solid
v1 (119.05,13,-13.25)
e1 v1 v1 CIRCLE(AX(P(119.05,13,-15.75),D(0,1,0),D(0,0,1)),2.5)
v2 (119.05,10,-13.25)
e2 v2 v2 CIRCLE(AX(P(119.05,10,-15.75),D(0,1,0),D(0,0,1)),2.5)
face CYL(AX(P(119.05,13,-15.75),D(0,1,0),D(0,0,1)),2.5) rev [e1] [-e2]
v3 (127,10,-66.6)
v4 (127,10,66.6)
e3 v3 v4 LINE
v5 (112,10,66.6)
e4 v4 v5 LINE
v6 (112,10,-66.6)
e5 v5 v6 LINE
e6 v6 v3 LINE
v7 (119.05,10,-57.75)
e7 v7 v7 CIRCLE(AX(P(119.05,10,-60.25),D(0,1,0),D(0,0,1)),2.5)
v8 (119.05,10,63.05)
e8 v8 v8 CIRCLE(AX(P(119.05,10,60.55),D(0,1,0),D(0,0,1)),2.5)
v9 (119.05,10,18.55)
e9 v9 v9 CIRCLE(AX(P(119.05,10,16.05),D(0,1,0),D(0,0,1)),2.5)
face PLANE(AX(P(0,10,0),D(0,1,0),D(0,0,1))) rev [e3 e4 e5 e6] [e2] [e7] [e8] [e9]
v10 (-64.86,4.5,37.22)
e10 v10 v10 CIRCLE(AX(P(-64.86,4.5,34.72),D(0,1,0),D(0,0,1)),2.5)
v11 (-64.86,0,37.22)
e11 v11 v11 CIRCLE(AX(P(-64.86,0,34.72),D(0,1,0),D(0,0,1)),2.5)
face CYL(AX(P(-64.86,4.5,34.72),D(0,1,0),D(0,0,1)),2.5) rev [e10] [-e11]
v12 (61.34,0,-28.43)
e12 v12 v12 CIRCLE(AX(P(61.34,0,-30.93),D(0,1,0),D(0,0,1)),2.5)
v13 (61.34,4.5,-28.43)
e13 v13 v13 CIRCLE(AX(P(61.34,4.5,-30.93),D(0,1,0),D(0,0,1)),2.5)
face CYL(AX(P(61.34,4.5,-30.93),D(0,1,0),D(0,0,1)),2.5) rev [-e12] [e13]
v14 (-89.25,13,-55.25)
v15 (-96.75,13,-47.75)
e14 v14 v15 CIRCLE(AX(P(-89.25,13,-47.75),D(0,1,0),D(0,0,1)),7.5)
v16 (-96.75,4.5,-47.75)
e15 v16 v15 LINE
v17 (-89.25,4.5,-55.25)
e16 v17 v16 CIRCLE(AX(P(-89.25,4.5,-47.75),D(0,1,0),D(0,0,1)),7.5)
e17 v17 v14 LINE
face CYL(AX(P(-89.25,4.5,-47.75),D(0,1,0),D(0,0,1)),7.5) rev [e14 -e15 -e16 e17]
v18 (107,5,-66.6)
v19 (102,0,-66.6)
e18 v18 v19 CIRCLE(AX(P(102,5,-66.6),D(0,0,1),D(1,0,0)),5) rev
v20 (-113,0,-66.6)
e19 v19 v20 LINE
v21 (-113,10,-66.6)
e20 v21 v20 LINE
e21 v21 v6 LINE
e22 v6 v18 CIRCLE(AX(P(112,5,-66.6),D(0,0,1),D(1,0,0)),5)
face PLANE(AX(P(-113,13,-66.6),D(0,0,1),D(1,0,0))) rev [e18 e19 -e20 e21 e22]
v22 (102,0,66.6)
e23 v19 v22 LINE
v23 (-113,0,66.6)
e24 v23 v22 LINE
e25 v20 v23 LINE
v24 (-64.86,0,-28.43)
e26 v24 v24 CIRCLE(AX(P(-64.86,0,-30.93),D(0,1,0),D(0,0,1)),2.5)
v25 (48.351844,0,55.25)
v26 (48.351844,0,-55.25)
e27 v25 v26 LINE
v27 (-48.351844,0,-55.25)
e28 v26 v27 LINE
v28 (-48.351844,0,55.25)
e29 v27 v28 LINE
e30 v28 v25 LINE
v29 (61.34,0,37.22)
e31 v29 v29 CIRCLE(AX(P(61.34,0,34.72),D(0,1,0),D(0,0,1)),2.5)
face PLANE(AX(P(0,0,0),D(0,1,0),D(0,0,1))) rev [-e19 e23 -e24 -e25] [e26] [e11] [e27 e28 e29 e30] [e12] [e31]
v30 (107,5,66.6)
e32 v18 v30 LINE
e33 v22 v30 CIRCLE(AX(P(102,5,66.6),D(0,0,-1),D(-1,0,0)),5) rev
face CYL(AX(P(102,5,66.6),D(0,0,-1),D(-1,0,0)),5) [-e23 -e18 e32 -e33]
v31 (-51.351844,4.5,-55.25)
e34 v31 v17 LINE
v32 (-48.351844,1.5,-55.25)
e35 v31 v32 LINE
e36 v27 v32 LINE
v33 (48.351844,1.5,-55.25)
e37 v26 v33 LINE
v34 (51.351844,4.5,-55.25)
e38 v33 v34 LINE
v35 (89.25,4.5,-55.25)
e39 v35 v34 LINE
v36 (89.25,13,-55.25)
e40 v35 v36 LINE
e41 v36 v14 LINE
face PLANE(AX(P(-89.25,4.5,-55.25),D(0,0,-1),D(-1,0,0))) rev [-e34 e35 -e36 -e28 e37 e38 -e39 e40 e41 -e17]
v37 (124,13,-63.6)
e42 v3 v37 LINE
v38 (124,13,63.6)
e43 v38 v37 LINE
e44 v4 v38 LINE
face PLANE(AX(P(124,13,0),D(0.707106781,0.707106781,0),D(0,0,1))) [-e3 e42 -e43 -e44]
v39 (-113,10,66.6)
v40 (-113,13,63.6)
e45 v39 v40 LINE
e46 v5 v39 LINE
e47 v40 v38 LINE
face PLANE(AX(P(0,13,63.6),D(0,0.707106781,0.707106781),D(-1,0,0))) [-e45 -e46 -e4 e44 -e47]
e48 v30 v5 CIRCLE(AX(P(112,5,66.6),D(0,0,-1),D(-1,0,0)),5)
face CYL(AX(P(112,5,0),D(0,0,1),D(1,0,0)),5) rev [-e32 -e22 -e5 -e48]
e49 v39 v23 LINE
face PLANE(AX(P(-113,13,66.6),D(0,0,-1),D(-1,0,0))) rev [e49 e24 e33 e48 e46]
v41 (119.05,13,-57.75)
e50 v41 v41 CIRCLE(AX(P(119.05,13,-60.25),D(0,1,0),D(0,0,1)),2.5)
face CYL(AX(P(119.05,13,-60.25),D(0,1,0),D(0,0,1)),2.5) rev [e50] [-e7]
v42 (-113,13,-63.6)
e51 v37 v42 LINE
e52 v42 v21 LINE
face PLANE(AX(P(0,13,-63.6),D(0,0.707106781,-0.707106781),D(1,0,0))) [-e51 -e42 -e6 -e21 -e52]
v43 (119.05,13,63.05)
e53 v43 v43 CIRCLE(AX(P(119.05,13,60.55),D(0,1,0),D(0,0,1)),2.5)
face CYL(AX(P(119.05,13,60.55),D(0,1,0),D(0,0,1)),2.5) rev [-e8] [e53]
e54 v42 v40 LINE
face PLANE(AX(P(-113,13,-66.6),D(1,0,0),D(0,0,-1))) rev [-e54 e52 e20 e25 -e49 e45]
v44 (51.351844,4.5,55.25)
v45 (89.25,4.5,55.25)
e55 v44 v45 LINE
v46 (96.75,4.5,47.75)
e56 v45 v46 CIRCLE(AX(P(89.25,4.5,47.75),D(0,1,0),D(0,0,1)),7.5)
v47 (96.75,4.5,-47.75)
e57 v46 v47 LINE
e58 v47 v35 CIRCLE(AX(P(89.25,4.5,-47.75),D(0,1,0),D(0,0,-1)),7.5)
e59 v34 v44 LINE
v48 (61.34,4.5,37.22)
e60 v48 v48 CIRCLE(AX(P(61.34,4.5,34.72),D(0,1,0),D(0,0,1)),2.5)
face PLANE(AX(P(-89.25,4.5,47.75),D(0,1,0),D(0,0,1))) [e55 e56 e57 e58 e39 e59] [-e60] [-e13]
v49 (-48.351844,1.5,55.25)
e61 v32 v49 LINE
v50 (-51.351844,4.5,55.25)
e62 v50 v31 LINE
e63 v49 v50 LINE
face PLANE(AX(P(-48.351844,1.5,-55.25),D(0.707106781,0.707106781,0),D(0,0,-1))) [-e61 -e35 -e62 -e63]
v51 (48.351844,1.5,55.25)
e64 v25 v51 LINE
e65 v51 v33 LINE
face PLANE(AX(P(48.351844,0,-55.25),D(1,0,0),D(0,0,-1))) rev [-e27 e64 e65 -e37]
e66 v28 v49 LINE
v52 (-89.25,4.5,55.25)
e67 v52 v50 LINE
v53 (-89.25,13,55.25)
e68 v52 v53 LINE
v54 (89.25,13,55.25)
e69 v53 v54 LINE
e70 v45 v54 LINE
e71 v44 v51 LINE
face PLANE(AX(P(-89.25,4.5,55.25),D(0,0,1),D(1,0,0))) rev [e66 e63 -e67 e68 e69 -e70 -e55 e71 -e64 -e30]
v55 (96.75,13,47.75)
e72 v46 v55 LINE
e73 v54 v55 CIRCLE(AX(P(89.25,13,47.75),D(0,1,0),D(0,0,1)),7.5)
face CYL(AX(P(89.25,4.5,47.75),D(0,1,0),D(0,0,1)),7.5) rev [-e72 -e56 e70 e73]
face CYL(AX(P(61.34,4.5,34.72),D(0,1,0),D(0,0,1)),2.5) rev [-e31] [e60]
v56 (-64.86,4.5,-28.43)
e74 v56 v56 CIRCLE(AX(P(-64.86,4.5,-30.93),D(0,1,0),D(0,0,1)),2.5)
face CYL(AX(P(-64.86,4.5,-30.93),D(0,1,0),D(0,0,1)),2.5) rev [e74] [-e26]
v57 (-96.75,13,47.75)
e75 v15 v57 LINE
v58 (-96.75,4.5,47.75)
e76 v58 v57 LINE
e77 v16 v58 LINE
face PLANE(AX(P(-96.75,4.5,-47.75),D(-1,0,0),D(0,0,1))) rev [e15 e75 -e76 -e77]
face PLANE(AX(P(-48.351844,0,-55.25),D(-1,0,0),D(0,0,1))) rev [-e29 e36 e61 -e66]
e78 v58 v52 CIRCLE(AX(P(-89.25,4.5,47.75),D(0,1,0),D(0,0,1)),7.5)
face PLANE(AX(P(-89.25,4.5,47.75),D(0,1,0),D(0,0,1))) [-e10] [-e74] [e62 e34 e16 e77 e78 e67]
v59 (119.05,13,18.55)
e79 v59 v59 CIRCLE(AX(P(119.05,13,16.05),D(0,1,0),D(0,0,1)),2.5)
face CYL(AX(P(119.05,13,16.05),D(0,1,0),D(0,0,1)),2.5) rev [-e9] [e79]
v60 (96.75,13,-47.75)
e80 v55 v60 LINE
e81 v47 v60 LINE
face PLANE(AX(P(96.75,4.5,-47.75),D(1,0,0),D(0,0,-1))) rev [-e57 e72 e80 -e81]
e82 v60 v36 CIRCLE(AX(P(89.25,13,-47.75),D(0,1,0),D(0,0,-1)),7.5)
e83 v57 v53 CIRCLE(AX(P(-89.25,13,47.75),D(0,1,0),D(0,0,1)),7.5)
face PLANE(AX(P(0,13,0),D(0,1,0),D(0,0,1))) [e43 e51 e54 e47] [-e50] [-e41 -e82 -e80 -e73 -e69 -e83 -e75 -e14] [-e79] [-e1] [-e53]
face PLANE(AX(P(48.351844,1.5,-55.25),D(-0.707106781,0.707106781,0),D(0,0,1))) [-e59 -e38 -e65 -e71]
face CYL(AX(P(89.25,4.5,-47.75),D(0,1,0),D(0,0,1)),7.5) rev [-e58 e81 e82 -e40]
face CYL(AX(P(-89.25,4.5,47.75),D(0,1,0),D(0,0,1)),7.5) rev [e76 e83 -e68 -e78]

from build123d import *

# Parameters (mm, degrees)
SKETCH1_W                        = 240
SKETCH1_H                        = 133.2
BOSS_EXTRUDE1_DEPTH              = 13
CUT_EXTRUDE1_DEPTH               = 8.5
F_1_8_27_NPSM_TAPPED_HOLE1_D     = 5
F_1_8_27_NPSM_TAPPED_HOLE1_DEPTH = 22.99
F_1_8_27_NPSM_TAPPED_HOLE1_TIP   = 1.502151548
SKETCH6_W                        = 96.703687768
SKETCH6_H                        = 110.5
CUT_EXTRUDE2_DEPTH               = 144.655177421
SKETCH32_W                       = 20
SKETCH32_H                       = 133.2
CUT_EXTRUDE10_DEPTH              = 10
FILLET1_START                    = -68
FILLET1_DEPTH                    = 136
FILLET1_START_2                  = -66.6
FILLET1_2_DEPTH                  = 133.2
M6X1_0_TAPPED_HOLE1_D            = 5
M6X1_0_TAPPED_HOLE1_DEPTH        = 15
M6X1_0_TAPPED_HOLE1_TIP          = 1.502151548
CHAMFER1_SIZE                    = 3


with BuildPart() as part:
    # Sketch1 → Boss-Extrude1 (new body)
    with BuildSketch(Plane(origin=(0, 0, 0), x_dir=(1, 0, 0), z_dir=(0, 1, 0))):
        with Locations((7, 0)):
            Rectangle(SKETCH1_W, SKETCH1_H)
    extrude(amount=BOSS_EXTRUDE1_DEPTH)

    # Sketch2 → Cut-Extrude1 (cut)
    with BuildSketch(Plane(origin=(0, 13, 0), x_dir=(1, 0, 0), z_dir=(0, 1, 0))):
        with BuildLine():
            Line((-89.25, 55.25), (89.25, 55.25))
            ThreePointArc((89.25, 55.25), (94.553300859, 53.053300859), (96.75, 47.75))
            Line((96.75, 47.75), (96.75, -47.75))
            ThreePointArc((96.75, -47.75), (94.553300859, -53.053300859), (89.25, -55.25))
            Line((89.25, -55.25), (-89.25, -55.25))
            ThreePointArc((-89.25, -55.25), (-94.553300859, -53.053300859), (-96.75, -47.75))
            Line((-96.75, -47.75), (-96.75, 47.75))
            ThreePointArc((-96.75, 47.75), (-94.553300859, 53.053300859), (-89.25, 55.25))
        make_face()
    extrude(amount=-CUT_EXTRUDE1_DEPTH, mode=Mode.SUBTRACT)

    # 1/8-27 NPSM Tapped Hole1
    with Locations(Plane(origin=(0, 4.5, 0), x_dir=(1, 0, 0), z_dir=(0, 1, 0))):
        with Locations((-64.86, 30.93), (61.34, 30.93), (61.34, -34.72), (-64.86, -34.72)):
            Hole(F_1_8_27_NPSM_TAPPED_HOLE1_D / 2, depth=F_1_8_27_NPSM_TAPPED_HOLE1_DEPTH)
            with Locations((0, 0, -(F_1_8_27_NPSM_TAPPED_HOLE1_DEPTH + F_1_8_27_NPSM_TAPPED_HOLE1_TIP / 2))):  # 118° drill point
                Cone(0, F_1_8_27_NPSM_TAPPED_HOLE1_D / 2, F_1_8_27_NPSM_TAPPED_HOLE1_TIP, mode=Mode.SUBTRACT)

    # Sketch6 → Cut-Extrude2 (cut, through all)
    with BuildSketch(Plane(origin=(0, 4.5, 0), x_dir=(1, 0, 0), z_dir=(0, 1, 0))):
        Rectangle(SKETCH6_W, SKETCH6_H)
    extrude(amount=-CUT_EXTRUDE2_DEPTH, mode=Mode.SUBTRACT)

    # Sketch32 → Cut-Extrude10 (cut)
    with BuildSketch(Plane.XZ):
        with Locations((117, 0)):
            Rectangle(SKETCH32_W, SKETCH32_H)
    extrude(amount=-CUT_EXTRUDE10_DEPTH, mode=Mode.SUBTRACT)

    # Fillet1: read off the stored shape, not the designer's step
    # Fillet1 outline → Fillet1 (cut)
    with BuildSketch(Plane.XY.offset(FILLET1_START)):
        with BuildLine():
            Line((107, 0), (107, 5))
            ThreePointArc((107, 5), (105.535533906, 1.464466094), (102, 0))
            Line((102, 0), (107, 0))
        make_face()
    extrude(amount=FILLET1_DEPTH, mode=Mode.SUBTRACT)

    # Fillet1 2 outline → Fillet1 2 (add)
    with BuildSketch(Plane.XY.offset(FILLET1_START_2)):
        with BuildLine():
            ThreePointArc((107, 5), (108.464466094, 8.535533906), (112, 10))
            Line((112, 10), (107, 10))
            Line((107, 10), (107, 5))
        make_face()
    extrude(amount=FILLET1_2_DEPTH)

    # M6x1.0 Tapped Hole1
    with Locations(Plane(origin=(0, 13, 0), x_dir=(1, 0, 0), z_dir=(0, 1, 0))):
        with Locations((119.05, 60.25), (119.05, 15.75), (119.05, -16.05), (119.05, -60.55)):
            Hole(M6X1_0_TAPPED_HOLE1_D / 2, depth=M6X1_0_TAPPED_HOLE1_DEPTH)
            with Locations((0, 0, -(M6X1_0_TAPPED_HOLE1_DEPTH + M6X1_0_TAPPED_HOLE1_TIP / 2))):  # 118° drill point
                Cone(0, M6X1_0_TAPPED_HOLE1_D / 2, M6X1_0_TAPPED_HOLE1_TIP, mode=Mode.SUBTRACT)

    # Chamfer1
    chamfer1_edges = [part.edges().sort_by_distance(p)[0] for p in [
        (7, 13, 66.6),
        (127, 13, 0),
        (7, 13, -66.6),
        (48.351843884, 4.5, 0),
        (-48.351843884, 4.5, 0),
    ]]
    chamfer(chamfer1_edges, length=CHAMFER1_SIZE - 0.0001)  # a hair under: the kernel refuses the full size


solid = part.part
